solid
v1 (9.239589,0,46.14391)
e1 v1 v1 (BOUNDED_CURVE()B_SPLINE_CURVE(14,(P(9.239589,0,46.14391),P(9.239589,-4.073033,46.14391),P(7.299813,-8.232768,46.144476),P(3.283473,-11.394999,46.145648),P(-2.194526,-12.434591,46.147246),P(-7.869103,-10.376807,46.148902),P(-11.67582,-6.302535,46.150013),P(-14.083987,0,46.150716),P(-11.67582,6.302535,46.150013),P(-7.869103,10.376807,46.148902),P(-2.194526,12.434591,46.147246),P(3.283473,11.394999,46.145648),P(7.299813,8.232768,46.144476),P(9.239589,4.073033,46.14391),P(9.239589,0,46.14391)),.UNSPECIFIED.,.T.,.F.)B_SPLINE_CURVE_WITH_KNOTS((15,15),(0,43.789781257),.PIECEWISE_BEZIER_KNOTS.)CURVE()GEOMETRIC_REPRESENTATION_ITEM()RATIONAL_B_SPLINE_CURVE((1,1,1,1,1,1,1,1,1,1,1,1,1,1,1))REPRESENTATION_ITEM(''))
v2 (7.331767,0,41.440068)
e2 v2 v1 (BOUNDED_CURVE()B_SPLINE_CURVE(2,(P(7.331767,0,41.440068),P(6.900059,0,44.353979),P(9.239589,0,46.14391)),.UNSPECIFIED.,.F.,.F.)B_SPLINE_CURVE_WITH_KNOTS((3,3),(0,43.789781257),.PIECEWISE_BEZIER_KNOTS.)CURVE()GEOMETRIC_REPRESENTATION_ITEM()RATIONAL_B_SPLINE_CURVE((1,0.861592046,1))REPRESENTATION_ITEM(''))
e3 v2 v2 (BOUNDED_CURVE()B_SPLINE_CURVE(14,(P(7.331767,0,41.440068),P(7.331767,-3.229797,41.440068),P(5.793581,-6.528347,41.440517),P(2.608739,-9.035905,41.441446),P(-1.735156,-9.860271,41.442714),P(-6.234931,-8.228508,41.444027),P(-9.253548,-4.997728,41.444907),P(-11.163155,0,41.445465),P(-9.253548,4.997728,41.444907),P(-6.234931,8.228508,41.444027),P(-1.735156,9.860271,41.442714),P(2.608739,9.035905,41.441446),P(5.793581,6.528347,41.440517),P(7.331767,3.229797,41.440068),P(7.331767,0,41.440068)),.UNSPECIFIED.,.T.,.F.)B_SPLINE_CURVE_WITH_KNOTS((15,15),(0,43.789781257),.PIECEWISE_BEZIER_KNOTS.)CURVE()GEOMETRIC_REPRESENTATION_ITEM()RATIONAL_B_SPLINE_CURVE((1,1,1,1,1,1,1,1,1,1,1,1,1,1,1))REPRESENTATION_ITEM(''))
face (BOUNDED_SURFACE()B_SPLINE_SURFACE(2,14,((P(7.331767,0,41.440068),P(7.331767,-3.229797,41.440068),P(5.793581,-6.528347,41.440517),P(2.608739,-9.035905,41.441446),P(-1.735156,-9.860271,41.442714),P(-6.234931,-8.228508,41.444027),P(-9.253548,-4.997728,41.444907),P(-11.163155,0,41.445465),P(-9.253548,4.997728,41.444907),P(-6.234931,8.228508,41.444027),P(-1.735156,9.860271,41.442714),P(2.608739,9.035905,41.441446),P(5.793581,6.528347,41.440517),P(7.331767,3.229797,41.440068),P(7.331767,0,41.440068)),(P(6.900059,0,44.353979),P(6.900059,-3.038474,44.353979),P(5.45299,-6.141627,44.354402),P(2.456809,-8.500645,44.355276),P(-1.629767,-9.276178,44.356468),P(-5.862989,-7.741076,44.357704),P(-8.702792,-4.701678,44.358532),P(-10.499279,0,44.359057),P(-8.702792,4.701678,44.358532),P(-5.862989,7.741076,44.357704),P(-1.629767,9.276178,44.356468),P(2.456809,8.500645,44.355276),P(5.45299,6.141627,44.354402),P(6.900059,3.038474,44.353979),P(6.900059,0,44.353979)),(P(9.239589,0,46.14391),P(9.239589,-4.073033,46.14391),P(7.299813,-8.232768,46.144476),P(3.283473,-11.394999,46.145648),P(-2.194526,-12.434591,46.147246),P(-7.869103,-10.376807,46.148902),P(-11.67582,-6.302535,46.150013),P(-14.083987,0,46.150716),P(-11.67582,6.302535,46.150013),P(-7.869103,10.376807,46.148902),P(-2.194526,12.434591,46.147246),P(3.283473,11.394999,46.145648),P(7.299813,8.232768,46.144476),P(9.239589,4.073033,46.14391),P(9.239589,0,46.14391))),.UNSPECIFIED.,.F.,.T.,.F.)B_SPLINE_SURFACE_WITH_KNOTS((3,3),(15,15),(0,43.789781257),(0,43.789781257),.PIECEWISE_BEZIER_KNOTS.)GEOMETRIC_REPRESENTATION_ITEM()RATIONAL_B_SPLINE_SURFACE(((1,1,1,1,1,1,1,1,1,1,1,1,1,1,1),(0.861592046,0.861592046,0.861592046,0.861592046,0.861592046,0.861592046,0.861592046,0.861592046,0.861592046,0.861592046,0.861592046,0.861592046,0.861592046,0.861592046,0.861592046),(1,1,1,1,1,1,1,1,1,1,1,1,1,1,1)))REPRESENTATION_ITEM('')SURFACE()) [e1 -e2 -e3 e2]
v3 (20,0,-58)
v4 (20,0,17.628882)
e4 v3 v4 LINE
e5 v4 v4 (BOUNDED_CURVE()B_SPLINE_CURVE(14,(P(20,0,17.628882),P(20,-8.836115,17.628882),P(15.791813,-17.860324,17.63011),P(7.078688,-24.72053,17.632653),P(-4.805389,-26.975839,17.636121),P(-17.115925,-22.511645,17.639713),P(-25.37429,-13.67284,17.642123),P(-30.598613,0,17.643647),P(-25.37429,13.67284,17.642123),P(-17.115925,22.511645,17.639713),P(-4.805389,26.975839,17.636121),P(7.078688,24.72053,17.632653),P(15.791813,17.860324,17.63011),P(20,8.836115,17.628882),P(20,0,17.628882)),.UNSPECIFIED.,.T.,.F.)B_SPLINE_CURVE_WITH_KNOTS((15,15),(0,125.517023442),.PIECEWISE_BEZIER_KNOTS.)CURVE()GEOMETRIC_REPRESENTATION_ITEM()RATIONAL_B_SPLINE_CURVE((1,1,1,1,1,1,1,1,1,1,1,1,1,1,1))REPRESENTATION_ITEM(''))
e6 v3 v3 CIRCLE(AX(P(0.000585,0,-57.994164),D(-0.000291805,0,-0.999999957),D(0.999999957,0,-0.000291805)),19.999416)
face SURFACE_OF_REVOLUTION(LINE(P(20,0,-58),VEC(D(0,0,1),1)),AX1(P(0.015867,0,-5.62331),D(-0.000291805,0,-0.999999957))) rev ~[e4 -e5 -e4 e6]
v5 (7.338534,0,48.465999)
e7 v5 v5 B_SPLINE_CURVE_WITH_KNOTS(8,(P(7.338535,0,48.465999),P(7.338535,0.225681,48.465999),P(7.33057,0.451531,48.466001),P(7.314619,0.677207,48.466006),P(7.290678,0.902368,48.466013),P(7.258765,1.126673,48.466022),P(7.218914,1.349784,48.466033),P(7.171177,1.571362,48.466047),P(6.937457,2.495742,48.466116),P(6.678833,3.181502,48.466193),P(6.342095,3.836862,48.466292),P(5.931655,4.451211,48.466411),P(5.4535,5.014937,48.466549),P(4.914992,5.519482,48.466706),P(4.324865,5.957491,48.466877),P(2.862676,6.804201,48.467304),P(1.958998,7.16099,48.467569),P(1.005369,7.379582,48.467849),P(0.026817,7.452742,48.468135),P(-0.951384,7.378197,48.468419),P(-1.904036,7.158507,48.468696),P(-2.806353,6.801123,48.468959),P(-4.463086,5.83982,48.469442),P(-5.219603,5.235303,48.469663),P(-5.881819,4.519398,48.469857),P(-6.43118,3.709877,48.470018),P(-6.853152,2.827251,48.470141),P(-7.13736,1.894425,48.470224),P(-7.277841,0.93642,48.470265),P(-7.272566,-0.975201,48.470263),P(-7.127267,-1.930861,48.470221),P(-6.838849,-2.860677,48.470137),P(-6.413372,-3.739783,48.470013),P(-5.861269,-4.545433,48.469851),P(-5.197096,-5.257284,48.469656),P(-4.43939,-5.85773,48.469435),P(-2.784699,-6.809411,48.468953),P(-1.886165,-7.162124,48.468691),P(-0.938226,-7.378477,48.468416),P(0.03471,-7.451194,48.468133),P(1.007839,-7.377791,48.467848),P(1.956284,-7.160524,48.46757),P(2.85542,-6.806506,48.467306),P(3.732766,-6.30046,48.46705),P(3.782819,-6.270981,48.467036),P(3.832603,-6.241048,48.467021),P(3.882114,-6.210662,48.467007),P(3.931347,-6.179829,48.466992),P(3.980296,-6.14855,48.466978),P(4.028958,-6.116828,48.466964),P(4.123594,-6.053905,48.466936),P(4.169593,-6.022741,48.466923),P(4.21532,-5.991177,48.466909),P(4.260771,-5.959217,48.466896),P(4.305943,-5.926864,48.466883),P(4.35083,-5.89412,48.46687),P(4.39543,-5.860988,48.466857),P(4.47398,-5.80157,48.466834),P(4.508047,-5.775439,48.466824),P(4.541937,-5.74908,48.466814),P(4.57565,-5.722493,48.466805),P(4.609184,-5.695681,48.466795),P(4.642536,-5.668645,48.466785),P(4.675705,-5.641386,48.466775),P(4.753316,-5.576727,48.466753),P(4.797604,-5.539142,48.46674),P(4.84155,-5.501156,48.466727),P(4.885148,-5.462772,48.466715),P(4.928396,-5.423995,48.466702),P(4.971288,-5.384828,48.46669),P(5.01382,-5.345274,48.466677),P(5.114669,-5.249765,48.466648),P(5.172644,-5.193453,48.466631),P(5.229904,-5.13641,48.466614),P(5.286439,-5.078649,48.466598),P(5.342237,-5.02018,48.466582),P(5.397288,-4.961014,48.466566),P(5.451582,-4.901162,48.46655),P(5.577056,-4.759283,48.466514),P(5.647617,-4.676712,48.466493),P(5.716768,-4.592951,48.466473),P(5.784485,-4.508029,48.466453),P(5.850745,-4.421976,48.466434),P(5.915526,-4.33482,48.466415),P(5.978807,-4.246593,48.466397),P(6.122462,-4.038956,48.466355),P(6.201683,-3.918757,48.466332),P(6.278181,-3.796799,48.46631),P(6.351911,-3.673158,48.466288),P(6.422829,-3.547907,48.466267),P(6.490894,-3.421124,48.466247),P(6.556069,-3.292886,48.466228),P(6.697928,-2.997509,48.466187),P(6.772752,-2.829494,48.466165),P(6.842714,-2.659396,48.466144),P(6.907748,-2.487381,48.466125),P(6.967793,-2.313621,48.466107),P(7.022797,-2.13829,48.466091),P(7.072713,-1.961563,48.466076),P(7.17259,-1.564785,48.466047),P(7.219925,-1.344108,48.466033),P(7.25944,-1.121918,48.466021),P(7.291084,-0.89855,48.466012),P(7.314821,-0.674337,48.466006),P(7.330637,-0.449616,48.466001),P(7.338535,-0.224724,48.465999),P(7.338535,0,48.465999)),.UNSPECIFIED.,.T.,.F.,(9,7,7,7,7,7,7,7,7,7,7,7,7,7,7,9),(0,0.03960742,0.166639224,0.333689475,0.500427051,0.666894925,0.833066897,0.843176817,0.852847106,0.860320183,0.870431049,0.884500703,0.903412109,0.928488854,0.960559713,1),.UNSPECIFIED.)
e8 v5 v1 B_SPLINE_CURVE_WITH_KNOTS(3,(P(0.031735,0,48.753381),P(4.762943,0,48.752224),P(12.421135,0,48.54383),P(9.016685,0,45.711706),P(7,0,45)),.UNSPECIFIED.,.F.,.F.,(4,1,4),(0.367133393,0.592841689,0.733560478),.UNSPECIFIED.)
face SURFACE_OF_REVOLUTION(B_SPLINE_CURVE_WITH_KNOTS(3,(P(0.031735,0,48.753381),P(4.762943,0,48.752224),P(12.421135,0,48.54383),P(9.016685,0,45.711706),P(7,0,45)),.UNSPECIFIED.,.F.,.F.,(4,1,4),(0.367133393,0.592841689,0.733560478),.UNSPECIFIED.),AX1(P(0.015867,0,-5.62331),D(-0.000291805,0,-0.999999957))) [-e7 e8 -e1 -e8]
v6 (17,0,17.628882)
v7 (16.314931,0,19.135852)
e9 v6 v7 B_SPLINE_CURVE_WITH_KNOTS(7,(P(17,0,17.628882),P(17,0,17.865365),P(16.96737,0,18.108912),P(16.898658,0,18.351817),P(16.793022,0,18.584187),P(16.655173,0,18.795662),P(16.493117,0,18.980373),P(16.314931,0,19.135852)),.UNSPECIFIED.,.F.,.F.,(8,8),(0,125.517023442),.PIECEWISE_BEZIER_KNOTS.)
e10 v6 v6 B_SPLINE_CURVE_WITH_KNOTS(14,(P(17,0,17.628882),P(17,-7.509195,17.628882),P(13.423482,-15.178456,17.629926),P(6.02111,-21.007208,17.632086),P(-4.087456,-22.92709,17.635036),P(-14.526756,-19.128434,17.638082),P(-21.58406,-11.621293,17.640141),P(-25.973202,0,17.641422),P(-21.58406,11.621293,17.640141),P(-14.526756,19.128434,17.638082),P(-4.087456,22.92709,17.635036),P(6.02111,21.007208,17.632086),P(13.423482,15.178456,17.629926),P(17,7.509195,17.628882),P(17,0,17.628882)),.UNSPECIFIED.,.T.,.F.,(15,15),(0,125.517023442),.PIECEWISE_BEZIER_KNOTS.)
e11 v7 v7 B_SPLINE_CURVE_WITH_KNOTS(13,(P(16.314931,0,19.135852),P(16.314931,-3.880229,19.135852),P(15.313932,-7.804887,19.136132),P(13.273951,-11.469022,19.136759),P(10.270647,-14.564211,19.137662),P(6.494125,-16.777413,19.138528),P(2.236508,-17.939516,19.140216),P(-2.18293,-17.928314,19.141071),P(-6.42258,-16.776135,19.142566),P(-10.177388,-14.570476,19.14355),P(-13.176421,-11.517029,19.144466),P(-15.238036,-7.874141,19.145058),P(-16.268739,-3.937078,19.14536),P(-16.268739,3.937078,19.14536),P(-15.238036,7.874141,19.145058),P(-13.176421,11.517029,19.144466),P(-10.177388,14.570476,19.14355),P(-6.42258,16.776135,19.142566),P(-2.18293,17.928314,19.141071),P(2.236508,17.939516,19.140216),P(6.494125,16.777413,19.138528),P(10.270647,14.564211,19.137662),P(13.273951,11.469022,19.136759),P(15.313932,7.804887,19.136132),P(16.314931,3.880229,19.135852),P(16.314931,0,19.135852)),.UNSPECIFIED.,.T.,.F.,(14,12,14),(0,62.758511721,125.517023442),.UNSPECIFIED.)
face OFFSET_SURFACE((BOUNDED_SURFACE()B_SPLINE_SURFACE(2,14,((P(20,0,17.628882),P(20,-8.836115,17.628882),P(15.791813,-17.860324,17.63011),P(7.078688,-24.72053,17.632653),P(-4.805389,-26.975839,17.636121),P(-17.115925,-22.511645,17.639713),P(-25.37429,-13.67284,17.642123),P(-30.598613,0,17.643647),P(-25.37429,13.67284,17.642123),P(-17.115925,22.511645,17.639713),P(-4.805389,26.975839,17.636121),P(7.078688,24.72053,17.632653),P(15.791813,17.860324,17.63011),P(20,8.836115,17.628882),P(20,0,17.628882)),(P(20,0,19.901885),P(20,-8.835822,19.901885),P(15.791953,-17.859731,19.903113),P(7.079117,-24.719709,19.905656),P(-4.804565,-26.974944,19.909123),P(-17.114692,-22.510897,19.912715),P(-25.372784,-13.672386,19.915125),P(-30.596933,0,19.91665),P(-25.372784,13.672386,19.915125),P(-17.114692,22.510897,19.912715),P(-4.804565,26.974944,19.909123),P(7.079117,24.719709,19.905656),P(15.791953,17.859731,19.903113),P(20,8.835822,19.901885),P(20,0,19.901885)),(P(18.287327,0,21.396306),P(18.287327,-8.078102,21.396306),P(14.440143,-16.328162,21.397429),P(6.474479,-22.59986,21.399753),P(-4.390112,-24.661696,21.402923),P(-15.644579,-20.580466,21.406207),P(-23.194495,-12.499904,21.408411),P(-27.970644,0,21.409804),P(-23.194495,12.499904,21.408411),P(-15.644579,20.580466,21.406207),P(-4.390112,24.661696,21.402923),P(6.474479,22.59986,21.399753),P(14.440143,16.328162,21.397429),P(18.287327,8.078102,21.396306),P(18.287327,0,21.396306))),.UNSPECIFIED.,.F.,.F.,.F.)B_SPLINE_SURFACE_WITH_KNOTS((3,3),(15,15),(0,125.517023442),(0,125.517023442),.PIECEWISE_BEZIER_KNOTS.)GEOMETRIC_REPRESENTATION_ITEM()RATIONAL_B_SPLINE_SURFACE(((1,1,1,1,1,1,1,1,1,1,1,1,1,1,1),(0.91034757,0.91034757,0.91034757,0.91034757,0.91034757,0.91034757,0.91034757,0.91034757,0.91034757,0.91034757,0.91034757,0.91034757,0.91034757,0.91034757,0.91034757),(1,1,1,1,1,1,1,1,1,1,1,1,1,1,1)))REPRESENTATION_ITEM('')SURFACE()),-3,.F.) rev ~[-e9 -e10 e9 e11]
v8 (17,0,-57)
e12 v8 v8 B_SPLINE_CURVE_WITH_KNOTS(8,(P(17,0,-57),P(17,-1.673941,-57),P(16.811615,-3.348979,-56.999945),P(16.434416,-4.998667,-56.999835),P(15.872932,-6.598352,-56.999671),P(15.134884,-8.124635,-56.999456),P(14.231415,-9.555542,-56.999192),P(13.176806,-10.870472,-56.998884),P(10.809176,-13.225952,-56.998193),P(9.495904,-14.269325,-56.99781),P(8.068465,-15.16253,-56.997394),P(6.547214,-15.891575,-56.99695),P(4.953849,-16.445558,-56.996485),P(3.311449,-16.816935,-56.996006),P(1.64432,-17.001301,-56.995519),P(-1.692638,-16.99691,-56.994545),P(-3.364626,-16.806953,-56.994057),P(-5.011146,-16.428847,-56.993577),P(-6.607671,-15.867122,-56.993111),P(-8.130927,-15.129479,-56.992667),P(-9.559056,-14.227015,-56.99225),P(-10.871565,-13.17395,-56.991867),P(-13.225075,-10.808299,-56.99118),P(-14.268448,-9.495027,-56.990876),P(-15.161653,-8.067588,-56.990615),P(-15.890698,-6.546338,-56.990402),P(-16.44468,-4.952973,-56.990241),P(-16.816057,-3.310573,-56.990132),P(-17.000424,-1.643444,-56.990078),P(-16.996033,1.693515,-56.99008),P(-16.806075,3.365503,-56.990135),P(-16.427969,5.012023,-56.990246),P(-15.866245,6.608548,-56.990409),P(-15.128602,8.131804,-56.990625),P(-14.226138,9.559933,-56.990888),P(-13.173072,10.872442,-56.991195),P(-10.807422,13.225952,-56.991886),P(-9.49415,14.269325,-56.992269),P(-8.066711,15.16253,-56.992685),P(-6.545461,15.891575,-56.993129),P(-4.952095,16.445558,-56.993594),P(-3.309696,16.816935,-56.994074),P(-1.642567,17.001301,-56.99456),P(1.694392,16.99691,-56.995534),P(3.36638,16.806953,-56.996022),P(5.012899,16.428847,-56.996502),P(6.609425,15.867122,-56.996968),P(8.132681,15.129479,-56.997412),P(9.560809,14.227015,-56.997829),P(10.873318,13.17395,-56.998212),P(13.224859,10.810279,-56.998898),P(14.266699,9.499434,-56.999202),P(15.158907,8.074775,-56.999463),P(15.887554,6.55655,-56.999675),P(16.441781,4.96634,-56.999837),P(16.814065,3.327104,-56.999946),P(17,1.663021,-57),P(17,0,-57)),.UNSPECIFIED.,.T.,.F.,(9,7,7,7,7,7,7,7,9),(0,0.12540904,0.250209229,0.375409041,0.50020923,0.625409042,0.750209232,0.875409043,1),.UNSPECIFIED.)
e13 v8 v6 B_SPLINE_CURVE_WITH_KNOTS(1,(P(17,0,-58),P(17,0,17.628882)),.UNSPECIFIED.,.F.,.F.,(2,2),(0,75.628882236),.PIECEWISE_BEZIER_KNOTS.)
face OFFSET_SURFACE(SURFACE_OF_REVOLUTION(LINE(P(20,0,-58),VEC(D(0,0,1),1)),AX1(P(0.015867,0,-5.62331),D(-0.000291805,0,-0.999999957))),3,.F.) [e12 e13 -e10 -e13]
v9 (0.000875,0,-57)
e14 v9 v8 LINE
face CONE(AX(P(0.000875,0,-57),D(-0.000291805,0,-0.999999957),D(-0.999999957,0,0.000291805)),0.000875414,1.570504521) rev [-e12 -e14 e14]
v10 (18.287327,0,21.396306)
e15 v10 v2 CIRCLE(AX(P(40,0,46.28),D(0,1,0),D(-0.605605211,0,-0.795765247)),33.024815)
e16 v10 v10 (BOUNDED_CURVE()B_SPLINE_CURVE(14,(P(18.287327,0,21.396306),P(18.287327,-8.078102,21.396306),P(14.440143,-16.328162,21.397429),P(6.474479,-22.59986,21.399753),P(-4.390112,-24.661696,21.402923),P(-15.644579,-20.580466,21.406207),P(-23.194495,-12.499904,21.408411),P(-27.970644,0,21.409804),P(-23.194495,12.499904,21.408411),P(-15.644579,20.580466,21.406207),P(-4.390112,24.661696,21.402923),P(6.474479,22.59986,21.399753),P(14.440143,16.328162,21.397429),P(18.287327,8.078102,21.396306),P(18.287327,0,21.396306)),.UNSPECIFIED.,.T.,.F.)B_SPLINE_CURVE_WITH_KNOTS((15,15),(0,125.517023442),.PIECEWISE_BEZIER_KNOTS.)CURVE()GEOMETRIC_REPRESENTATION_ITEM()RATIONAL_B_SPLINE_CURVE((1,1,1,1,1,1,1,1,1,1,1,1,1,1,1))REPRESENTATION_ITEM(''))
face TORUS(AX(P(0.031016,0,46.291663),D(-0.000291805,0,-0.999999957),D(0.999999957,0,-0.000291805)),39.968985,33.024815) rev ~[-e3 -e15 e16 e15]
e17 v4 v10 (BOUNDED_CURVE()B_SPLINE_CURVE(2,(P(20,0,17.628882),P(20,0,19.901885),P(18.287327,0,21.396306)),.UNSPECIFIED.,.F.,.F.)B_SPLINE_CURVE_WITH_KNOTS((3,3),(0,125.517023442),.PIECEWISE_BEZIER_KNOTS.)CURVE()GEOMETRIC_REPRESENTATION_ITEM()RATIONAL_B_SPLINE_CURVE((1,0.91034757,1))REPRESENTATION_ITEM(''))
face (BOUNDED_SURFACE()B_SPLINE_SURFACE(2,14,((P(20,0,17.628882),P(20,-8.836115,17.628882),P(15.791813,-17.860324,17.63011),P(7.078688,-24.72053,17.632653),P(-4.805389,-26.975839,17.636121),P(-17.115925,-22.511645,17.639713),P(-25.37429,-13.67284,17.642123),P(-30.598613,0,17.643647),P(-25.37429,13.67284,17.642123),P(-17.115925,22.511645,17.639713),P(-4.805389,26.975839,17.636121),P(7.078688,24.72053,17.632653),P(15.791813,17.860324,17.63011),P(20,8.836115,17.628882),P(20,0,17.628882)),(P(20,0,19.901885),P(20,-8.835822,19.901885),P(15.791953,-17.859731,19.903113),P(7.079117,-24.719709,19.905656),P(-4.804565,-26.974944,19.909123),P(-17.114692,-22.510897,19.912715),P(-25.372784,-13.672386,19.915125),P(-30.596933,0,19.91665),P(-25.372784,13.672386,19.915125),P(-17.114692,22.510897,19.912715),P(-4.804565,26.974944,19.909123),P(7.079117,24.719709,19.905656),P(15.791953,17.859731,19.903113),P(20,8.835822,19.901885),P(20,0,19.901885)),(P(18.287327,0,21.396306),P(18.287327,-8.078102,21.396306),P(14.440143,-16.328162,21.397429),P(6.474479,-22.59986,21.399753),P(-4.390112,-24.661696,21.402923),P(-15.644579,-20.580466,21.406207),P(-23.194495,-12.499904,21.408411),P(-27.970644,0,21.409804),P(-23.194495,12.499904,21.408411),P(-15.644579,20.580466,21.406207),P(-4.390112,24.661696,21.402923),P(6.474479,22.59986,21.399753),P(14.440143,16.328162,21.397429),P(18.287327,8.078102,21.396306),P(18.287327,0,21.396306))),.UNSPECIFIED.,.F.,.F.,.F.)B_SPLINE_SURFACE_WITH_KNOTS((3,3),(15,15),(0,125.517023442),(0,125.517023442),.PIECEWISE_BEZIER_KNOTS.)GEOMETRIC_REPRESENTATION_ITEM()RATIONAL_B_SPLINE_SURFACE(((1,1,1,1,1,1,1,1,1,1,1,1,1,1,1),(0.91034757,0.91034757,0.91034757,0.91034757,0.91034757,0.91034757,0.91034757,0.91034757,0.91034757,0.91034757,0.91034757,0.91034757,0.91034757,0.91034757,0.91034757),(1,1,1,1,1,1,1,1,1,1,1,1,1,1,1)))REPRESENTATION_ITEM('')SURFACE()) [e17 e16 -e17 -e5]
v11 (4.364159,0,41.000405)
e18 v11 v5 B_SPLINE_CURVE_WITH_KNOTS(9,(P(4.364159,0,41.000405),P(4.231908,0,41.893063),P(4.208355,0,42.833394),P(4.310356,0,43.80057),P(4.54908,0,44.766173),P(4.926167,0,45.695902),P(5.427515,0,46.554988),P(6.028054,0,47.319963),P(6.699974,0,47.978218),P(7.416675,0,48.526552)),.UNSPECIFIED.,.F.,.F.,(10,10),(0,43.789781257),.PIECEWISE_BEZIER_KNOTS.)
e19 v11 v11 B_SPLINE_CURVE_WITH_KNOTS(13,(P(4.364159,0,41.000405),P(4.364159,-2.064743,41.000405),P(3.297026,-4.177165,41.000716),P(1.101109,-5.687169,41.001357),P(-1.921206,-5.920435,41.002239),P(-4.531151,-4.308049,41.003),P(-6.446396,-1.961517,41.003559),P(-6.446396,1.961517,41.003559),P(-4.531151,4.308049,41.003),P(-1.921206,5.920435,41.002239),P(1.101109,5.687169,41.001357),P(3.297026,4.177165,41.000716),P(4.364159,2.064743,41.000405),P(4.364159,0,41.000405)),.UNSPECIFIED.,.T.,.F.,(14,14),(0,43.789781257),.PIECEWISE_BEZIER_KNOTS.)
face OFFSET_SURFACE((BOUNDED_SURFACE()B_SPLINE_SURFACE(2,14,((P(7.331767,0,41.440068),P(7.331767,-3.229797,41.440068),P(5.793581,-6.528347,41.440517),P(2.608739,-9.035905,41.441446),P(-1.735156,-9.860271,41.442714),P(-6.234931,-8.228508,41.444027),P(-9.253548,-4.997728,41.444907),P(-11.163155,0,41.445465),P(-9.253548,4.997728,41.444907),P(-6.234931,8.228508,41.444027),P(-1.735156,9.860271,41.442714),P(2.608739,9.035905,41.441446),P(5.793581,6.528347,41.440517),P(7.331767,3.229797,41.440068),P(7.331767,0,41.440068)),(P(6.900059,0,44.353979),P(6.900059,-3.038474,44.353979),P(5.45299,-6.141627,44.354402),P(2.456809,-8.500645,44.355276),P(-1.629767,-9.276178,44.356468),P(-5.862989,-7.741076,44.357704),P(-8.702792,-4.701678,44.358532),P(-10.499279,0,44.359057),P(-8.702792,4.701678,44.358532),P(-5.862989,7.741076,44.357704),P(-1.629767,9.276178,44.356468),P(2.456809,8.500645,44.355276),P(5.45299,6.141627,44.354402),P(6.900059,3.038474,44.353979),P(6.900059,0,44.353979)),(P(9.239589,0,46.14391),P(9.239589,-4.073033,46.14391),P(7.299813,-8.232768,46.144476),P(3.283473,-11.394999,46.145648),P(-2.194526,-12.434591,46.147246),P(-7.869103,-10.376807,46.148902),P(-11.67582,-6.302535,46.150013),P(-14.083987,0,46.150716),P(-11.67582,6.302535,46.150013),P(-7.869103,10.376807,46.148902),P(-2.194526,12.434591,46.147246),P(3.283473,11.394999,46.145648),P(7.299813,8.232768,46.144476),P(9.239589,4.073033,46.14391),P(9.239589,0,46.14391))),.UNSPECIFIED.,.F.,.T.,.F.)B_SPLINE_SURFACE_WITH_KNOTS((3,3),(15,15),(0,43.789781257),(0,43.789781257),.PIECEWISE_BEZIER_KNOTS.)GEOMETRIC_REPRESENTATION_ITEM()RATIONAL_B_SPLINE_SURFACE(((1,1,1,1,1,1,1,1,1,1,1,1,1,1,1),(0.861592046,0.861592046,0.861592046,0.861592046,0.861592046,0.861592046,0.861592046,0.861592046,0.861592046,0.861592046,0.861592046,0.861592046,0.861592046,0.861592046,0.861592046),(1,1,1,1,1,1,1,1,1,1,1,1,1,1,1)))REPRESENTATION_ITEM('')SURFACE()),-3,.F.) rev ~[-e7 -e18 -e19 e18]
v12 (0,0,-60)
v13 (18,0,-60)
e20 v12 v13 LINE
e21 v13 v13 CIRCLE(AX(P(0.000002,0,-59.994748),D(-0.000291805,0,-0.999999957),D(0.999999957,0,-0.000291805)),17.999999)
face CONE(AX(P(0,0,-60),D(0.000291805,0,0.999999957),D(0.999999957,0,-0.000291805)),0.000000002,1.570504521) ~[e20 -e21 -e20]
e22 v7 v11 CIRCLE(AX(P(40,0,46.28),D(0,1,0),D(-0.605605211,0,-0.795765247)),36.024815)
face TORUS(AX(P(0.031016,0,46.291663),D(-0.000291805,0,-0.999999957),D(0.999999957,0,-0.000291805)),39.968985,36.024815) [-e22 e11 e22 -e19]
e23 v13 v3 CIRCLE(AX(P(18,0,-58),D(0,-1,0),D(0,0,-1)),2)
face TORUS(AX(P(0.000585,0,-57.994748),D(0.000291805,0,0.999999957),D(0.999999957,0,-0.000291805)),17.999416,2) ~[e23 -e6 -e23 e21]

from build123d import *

# Parameters (mm, degrees)
F2_R = 5
F3_T = 3


# Not quite as in the source:
# - a shell that OpenCascade refuses in one call is made with other operations: the cavity is built on its own and cut out


with BuildPart() as f1:
    # F0 (on Front) → F1 (revolve)
    with BuildSketch(Plane.XZ):
        with BuildLine():
            Line((0.0303446585, 43.9893868108), (0, -60))
            Line((0, -60), (18, -60))
            ThreePointArc((18, -60), (19.4142135624, -59.4142135624), (20, -58))
            Line((20, -58), (20, 20))
            ThreePointArc((20, 20), (10.699829352, 31.0439112631), (7, 45))
            add(Edge.make_bspline(
                [(7, 45), (5.0981917384, 44.3288351313), (2.5656114194, 43.9919770233), (0.0303446585, 43.9893868108)],
                knots=[0.7335604777, 0.7335604777, 0.7335604777, 0.7335604777, 0.8662634951, 0.8662634951, 0.8662634951, 0.8662634951], degree=3))
        make_face()
        with BuildLine():
            Line((0.0317348174, 48.7533809147), (0.0303446585, 43.9893868108))
            add(Edge.make_bspline(
                [(7, 45), (5.0981917384, 44.3288351313), (2.5656114194, 43.9919770233), (0.0303446585, 43.9893868108)],
                knots=[0.7335604777, 0.7335604777, 0.7335604777, 0.7335604777, 0.8662634951, 0.8662634951, 0.8662634951, 0.8662634951], degree=3))
            add(Edge.make_bspline(
                [(0.0317348174, 48.7533809147), (4.7629433155, 48.7522243079), (12.4211351263, 48.5438301873), (9.0166847824, 45.7117058036), (7, 45)],
                knots=[0.3671333927, 0.3671333927, 0.3671333927, 0.3671333927, 0.5928416886, 0.7335604777, 0.7335604777, 0.7335604777, 0.7335604777], degree=3))
        make_face()
        with BuildLine():
            add(Edge.make_bspline(
                [(0.0303446585, 43.9893868108), (-2.5246666918, 43.9867764257), (-5.0824064908, 44.3236607489), (-7, 45)],
                knots=[0.8662634951, 0.8662634951, 0.8662634951, 0.8662634951, 1, 1, 1, 1], degree=3))
            Line((0.0303446585, 43.9893868108), (0.0317348174, 48.7533809147))
            add(Edge.make_bspline(
                [(-7, 45), (-9.0177096511, 45.7116504242), (-12.4328083134, 48.5488604685), (-4.7142790246, 48.7545411409), (0.0317348174, 48.7533809147)],
                knots=[0, 0, 0, 0, 0.1407187891, 0.3671333927, 0.3671333927, 0.3671333927, 0.3671333927], degree=3))
        make_face()
    revolve(axis=Axis((0.0158674087, 0, -5.6233095426), (-0.0002918053, 0, -0.9999999574)))

    # F2
    f2_edges = [f1.edges().sort_by_distance(p)[0] for p in [
        (-19.953308, 0, 20.011659),
        (-6.93872, 0, 45.004067),
    ]]
    fillet(f2_edges, radius=F2_R)

    # F3: shell of thickness 3, made by hand


with BuildPart() as f3_core1:
    # F3_t2: copy of F1
    add(f1.part)

    # the walls: a layer under each face that stays
    f3_faces = [f3_core1.faces().sort_by_distance(p)[0] for p in [
        (-19.9767604628, 0, -20.1738934498),
        (-19.5052168736, 0, 19.7095019558),
        (-10.9686231738, 0, 30.4472386816),
        (-8.9999984673, 0, -59.9947475043),
        (-7.5836491668, 0, 44.0565358923),
    ]]
    thicken(f3_faces, amount=-F3_T, mode=Mode.SUBTRACT)


with BuildPart() as f1_1:
    add(f1.part)

    # what is left inside the walls is the cavity
    f3_cavity = [f3_core1.part.solids().sort_by_distance(p)[0] for p in [
        (-16.953728, 0, -32.113807),
    ]]
    add(f3_cavity, mode=Mode.SUBTRACT)


solid = f1_1.part
